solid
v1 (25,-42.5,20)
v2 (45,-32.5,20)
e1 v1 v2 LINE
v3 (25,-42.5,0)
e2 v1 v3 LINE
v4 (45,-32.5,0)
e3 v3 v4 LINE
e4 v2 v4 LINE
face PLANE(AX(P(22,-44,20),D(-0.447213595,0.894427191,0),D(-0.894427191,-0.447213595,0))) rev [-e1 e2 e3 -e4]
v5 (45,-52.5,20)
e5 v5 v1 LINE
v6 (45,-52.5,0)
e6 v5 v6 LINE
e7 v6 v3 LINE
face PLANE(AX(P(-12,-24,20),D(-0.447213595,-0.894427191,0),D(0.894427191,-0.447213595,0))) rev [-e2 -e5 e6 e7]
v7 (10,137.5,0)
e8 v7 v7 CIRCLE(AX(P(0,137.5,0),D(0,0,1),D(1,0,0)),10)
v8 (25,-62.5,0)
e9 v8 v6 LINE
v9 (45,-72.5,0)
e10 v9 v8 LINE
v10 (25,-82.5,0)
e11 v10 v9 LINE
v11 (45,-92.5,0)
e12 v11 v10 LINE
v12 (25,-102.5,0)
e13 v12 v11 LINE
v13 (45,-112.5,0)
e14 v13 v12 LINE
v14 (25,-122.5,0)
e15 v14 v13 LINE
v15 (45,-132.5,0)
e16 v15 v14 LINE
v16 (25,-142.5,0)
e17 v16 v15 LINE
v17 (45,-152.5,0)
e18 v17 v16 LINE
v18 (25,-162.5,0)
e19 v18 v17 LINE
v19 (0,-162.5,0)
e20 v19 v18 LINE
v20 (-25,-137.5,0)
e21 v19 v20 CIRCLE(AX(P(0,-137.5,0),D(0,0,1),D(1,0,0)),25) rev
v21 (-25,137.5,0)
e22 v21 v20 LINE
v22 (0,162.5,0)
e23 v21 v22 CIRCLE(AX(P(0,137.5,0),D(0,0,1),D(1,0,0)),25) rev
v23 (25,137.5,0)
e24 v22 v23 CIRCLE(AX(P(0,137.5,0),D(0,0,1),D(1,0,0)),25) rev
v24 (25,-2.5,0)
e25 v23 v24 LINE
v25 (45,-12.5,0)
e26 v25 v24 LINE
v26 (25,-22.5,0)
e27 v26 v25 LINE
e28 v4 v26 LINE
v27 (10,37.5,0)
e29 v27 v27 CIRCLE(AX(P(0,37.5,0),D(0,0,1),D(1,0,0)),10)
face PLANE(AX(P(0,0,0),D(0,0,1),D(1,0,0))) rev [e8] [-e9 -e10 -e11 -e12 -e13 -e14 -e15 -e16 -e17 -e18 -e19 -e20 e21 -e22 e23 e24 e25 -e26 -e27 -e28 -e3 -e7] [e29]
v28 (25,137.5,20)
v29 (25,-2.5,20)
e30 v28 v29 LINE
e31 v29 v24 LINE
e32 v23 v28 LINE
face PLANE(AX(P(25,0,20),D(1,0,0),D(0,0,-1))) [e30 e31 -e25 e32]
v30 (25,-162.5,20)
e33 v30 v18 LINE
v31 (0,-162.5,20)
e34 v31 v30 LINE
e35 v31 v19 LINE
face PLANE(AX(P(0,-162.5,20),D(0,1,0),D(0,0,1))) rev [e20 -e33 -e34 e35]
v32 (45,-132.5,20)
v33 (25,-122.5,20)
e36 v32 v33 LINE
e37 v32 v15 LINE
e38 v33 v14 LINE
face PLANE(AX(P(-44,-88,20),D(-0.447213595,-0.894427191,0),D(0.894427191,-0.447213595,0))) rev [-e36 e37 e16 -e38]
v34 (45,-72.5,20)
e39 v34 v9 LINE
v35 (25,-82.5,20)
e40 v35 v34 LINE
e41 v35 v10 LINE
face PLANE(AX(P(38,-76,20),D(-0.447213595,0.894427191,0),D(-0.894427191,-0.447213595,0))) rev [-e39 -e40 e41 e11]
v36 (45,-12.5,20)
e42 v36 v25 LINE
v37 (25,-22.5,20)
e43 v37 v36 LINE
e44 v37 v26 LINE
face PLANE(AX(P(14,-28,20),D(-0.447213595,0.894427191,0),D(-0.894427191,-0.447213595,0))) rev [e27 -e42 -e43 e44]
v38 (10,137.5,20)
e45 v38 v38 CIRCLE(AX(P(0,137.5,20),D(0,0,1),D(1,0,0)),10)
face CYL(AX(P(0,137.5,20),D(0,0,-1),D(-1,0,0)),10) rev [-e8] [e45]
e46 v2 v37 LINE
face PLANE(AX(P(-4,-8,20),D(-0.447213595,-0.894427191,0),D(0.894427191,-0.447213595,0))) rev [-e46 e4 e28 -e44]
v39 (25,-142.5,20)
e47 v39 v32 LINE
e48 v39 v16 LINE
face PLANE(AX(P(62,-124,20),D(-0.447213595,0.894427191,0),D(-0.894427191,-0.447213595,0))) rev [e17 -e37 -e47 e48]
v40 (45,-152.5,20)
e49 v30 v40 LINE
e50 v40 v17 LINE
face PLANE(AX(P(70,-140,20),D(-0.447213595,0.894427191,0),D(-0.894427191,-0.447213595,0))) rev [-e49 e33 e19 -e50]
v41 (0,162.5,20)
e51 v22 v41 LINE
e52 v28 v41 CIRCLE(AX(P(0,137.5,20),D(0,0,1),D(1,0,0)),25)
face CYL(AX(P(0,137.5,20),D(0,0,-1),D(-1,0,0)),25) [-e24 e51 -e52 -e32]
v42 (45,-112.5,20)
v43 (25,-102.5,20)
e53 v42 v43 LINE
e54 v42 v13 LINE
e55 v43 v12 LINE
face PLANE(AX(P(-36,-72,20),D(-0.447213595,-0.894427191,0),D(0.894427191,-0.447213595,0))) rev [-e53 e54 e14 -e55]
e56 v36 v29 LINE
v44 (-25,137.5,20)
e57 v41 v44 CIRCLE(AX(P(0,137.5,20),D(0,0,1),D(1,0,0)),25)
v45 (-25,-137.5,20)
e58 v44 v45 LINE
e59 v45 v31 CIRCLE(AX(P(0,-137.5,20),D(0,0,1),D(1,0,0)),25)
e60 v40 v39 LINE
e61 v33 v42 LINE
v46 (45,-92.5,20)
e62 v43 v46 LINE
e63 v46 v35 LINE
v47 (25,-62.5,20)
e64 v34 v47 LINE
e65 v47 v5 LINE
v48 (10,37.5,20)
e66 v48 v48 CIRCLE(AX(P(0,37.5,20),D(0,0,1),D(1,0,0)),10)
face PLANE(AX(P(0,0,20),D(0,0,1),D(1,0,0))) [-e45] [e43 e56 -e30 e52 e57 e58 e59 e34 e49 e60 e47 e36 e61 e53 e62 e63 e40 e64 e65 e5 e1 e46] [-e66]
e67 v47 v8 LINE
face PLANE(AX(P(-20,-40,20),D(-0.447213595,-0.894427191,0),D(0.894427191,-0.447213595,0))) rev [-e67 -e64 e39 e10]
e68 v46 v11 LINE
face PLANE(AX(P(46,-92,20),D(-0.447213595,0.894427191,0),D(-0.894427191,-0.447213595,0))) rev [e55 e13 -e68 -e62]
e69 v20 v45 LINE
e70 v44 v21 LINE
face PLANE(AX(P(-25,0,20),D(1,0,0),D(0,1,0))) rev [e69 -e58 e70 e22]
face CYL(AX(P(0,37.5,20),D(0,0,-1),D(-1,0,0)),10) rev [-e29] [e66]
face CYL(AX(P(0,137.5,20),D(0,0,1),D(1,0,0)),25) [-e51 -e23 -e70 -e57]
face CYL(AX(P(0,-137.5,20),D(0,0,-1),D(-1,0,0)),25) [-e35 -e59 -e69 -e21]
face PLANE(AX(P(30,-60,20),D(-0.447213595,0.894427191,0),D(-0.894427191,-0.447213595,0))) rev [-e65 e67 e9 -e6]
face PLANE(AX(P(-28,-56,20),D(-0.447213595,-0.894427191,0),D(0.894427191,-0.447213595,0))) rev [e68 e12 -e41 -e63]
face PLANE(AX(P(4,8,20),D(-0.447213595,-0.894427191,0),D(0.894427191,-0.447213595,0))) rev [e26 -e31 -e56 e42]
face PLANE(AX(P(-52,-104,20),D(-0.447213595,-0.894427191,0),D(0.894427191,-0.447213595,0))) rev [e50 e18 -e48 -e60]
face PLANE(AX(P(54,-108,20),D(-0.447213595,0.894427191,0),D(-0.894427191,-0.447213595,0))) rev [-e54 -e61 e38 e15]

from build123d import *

# Parameters (mm, degrees)
ESQUISSE1_R        = 10
BOSS_EXTRU_1_DEPTH = 20
CONG_1_R           = 25


with BuildPart() as part:
    # Esquisse1 → Boss.-Extru.1 (new body)
    with BuildSketch(Plane.XY):
        Polygon((25, 162.5), (-25, 162.5), (-25, -162.5), (25, -162.5), (45, -152.5), (25, -142.5), (45, -132.5), (25, -122.5), (45, -112.5), (25, -102.5), (45, -92.5), (25, -82.5), (45, -72.5), (25, -62.5), (45, -52.5), (25, -42.5), (45, -32.5), (25, -22.5), (45, -12.5), (25, -2.5), align=None)
        with Locations((0, 37.5)):
            Circle(ESQUISSE1_R, mode=Mode.SUBTRACT)
        with Locations((0, 137.5)):
            Circle(ESQUISSE1_R, mode=Mode.SUBTRACT)
    extrude(amount=BOSS_EXTRU_1_DEPTH)

    # Congé1
    cong_1_edges = [part.edges().sort_by_distance(p)[0] for p in [
        (-25, -162.5, 10),
        (25, 162.5, 10),
        (-25, 162.5, 10),
    ]]
    fillet(cong_1_edges, radius=CONG_1_R - 0.0001)  # a hair under: the kernel refuses the full size


solid = part.part
